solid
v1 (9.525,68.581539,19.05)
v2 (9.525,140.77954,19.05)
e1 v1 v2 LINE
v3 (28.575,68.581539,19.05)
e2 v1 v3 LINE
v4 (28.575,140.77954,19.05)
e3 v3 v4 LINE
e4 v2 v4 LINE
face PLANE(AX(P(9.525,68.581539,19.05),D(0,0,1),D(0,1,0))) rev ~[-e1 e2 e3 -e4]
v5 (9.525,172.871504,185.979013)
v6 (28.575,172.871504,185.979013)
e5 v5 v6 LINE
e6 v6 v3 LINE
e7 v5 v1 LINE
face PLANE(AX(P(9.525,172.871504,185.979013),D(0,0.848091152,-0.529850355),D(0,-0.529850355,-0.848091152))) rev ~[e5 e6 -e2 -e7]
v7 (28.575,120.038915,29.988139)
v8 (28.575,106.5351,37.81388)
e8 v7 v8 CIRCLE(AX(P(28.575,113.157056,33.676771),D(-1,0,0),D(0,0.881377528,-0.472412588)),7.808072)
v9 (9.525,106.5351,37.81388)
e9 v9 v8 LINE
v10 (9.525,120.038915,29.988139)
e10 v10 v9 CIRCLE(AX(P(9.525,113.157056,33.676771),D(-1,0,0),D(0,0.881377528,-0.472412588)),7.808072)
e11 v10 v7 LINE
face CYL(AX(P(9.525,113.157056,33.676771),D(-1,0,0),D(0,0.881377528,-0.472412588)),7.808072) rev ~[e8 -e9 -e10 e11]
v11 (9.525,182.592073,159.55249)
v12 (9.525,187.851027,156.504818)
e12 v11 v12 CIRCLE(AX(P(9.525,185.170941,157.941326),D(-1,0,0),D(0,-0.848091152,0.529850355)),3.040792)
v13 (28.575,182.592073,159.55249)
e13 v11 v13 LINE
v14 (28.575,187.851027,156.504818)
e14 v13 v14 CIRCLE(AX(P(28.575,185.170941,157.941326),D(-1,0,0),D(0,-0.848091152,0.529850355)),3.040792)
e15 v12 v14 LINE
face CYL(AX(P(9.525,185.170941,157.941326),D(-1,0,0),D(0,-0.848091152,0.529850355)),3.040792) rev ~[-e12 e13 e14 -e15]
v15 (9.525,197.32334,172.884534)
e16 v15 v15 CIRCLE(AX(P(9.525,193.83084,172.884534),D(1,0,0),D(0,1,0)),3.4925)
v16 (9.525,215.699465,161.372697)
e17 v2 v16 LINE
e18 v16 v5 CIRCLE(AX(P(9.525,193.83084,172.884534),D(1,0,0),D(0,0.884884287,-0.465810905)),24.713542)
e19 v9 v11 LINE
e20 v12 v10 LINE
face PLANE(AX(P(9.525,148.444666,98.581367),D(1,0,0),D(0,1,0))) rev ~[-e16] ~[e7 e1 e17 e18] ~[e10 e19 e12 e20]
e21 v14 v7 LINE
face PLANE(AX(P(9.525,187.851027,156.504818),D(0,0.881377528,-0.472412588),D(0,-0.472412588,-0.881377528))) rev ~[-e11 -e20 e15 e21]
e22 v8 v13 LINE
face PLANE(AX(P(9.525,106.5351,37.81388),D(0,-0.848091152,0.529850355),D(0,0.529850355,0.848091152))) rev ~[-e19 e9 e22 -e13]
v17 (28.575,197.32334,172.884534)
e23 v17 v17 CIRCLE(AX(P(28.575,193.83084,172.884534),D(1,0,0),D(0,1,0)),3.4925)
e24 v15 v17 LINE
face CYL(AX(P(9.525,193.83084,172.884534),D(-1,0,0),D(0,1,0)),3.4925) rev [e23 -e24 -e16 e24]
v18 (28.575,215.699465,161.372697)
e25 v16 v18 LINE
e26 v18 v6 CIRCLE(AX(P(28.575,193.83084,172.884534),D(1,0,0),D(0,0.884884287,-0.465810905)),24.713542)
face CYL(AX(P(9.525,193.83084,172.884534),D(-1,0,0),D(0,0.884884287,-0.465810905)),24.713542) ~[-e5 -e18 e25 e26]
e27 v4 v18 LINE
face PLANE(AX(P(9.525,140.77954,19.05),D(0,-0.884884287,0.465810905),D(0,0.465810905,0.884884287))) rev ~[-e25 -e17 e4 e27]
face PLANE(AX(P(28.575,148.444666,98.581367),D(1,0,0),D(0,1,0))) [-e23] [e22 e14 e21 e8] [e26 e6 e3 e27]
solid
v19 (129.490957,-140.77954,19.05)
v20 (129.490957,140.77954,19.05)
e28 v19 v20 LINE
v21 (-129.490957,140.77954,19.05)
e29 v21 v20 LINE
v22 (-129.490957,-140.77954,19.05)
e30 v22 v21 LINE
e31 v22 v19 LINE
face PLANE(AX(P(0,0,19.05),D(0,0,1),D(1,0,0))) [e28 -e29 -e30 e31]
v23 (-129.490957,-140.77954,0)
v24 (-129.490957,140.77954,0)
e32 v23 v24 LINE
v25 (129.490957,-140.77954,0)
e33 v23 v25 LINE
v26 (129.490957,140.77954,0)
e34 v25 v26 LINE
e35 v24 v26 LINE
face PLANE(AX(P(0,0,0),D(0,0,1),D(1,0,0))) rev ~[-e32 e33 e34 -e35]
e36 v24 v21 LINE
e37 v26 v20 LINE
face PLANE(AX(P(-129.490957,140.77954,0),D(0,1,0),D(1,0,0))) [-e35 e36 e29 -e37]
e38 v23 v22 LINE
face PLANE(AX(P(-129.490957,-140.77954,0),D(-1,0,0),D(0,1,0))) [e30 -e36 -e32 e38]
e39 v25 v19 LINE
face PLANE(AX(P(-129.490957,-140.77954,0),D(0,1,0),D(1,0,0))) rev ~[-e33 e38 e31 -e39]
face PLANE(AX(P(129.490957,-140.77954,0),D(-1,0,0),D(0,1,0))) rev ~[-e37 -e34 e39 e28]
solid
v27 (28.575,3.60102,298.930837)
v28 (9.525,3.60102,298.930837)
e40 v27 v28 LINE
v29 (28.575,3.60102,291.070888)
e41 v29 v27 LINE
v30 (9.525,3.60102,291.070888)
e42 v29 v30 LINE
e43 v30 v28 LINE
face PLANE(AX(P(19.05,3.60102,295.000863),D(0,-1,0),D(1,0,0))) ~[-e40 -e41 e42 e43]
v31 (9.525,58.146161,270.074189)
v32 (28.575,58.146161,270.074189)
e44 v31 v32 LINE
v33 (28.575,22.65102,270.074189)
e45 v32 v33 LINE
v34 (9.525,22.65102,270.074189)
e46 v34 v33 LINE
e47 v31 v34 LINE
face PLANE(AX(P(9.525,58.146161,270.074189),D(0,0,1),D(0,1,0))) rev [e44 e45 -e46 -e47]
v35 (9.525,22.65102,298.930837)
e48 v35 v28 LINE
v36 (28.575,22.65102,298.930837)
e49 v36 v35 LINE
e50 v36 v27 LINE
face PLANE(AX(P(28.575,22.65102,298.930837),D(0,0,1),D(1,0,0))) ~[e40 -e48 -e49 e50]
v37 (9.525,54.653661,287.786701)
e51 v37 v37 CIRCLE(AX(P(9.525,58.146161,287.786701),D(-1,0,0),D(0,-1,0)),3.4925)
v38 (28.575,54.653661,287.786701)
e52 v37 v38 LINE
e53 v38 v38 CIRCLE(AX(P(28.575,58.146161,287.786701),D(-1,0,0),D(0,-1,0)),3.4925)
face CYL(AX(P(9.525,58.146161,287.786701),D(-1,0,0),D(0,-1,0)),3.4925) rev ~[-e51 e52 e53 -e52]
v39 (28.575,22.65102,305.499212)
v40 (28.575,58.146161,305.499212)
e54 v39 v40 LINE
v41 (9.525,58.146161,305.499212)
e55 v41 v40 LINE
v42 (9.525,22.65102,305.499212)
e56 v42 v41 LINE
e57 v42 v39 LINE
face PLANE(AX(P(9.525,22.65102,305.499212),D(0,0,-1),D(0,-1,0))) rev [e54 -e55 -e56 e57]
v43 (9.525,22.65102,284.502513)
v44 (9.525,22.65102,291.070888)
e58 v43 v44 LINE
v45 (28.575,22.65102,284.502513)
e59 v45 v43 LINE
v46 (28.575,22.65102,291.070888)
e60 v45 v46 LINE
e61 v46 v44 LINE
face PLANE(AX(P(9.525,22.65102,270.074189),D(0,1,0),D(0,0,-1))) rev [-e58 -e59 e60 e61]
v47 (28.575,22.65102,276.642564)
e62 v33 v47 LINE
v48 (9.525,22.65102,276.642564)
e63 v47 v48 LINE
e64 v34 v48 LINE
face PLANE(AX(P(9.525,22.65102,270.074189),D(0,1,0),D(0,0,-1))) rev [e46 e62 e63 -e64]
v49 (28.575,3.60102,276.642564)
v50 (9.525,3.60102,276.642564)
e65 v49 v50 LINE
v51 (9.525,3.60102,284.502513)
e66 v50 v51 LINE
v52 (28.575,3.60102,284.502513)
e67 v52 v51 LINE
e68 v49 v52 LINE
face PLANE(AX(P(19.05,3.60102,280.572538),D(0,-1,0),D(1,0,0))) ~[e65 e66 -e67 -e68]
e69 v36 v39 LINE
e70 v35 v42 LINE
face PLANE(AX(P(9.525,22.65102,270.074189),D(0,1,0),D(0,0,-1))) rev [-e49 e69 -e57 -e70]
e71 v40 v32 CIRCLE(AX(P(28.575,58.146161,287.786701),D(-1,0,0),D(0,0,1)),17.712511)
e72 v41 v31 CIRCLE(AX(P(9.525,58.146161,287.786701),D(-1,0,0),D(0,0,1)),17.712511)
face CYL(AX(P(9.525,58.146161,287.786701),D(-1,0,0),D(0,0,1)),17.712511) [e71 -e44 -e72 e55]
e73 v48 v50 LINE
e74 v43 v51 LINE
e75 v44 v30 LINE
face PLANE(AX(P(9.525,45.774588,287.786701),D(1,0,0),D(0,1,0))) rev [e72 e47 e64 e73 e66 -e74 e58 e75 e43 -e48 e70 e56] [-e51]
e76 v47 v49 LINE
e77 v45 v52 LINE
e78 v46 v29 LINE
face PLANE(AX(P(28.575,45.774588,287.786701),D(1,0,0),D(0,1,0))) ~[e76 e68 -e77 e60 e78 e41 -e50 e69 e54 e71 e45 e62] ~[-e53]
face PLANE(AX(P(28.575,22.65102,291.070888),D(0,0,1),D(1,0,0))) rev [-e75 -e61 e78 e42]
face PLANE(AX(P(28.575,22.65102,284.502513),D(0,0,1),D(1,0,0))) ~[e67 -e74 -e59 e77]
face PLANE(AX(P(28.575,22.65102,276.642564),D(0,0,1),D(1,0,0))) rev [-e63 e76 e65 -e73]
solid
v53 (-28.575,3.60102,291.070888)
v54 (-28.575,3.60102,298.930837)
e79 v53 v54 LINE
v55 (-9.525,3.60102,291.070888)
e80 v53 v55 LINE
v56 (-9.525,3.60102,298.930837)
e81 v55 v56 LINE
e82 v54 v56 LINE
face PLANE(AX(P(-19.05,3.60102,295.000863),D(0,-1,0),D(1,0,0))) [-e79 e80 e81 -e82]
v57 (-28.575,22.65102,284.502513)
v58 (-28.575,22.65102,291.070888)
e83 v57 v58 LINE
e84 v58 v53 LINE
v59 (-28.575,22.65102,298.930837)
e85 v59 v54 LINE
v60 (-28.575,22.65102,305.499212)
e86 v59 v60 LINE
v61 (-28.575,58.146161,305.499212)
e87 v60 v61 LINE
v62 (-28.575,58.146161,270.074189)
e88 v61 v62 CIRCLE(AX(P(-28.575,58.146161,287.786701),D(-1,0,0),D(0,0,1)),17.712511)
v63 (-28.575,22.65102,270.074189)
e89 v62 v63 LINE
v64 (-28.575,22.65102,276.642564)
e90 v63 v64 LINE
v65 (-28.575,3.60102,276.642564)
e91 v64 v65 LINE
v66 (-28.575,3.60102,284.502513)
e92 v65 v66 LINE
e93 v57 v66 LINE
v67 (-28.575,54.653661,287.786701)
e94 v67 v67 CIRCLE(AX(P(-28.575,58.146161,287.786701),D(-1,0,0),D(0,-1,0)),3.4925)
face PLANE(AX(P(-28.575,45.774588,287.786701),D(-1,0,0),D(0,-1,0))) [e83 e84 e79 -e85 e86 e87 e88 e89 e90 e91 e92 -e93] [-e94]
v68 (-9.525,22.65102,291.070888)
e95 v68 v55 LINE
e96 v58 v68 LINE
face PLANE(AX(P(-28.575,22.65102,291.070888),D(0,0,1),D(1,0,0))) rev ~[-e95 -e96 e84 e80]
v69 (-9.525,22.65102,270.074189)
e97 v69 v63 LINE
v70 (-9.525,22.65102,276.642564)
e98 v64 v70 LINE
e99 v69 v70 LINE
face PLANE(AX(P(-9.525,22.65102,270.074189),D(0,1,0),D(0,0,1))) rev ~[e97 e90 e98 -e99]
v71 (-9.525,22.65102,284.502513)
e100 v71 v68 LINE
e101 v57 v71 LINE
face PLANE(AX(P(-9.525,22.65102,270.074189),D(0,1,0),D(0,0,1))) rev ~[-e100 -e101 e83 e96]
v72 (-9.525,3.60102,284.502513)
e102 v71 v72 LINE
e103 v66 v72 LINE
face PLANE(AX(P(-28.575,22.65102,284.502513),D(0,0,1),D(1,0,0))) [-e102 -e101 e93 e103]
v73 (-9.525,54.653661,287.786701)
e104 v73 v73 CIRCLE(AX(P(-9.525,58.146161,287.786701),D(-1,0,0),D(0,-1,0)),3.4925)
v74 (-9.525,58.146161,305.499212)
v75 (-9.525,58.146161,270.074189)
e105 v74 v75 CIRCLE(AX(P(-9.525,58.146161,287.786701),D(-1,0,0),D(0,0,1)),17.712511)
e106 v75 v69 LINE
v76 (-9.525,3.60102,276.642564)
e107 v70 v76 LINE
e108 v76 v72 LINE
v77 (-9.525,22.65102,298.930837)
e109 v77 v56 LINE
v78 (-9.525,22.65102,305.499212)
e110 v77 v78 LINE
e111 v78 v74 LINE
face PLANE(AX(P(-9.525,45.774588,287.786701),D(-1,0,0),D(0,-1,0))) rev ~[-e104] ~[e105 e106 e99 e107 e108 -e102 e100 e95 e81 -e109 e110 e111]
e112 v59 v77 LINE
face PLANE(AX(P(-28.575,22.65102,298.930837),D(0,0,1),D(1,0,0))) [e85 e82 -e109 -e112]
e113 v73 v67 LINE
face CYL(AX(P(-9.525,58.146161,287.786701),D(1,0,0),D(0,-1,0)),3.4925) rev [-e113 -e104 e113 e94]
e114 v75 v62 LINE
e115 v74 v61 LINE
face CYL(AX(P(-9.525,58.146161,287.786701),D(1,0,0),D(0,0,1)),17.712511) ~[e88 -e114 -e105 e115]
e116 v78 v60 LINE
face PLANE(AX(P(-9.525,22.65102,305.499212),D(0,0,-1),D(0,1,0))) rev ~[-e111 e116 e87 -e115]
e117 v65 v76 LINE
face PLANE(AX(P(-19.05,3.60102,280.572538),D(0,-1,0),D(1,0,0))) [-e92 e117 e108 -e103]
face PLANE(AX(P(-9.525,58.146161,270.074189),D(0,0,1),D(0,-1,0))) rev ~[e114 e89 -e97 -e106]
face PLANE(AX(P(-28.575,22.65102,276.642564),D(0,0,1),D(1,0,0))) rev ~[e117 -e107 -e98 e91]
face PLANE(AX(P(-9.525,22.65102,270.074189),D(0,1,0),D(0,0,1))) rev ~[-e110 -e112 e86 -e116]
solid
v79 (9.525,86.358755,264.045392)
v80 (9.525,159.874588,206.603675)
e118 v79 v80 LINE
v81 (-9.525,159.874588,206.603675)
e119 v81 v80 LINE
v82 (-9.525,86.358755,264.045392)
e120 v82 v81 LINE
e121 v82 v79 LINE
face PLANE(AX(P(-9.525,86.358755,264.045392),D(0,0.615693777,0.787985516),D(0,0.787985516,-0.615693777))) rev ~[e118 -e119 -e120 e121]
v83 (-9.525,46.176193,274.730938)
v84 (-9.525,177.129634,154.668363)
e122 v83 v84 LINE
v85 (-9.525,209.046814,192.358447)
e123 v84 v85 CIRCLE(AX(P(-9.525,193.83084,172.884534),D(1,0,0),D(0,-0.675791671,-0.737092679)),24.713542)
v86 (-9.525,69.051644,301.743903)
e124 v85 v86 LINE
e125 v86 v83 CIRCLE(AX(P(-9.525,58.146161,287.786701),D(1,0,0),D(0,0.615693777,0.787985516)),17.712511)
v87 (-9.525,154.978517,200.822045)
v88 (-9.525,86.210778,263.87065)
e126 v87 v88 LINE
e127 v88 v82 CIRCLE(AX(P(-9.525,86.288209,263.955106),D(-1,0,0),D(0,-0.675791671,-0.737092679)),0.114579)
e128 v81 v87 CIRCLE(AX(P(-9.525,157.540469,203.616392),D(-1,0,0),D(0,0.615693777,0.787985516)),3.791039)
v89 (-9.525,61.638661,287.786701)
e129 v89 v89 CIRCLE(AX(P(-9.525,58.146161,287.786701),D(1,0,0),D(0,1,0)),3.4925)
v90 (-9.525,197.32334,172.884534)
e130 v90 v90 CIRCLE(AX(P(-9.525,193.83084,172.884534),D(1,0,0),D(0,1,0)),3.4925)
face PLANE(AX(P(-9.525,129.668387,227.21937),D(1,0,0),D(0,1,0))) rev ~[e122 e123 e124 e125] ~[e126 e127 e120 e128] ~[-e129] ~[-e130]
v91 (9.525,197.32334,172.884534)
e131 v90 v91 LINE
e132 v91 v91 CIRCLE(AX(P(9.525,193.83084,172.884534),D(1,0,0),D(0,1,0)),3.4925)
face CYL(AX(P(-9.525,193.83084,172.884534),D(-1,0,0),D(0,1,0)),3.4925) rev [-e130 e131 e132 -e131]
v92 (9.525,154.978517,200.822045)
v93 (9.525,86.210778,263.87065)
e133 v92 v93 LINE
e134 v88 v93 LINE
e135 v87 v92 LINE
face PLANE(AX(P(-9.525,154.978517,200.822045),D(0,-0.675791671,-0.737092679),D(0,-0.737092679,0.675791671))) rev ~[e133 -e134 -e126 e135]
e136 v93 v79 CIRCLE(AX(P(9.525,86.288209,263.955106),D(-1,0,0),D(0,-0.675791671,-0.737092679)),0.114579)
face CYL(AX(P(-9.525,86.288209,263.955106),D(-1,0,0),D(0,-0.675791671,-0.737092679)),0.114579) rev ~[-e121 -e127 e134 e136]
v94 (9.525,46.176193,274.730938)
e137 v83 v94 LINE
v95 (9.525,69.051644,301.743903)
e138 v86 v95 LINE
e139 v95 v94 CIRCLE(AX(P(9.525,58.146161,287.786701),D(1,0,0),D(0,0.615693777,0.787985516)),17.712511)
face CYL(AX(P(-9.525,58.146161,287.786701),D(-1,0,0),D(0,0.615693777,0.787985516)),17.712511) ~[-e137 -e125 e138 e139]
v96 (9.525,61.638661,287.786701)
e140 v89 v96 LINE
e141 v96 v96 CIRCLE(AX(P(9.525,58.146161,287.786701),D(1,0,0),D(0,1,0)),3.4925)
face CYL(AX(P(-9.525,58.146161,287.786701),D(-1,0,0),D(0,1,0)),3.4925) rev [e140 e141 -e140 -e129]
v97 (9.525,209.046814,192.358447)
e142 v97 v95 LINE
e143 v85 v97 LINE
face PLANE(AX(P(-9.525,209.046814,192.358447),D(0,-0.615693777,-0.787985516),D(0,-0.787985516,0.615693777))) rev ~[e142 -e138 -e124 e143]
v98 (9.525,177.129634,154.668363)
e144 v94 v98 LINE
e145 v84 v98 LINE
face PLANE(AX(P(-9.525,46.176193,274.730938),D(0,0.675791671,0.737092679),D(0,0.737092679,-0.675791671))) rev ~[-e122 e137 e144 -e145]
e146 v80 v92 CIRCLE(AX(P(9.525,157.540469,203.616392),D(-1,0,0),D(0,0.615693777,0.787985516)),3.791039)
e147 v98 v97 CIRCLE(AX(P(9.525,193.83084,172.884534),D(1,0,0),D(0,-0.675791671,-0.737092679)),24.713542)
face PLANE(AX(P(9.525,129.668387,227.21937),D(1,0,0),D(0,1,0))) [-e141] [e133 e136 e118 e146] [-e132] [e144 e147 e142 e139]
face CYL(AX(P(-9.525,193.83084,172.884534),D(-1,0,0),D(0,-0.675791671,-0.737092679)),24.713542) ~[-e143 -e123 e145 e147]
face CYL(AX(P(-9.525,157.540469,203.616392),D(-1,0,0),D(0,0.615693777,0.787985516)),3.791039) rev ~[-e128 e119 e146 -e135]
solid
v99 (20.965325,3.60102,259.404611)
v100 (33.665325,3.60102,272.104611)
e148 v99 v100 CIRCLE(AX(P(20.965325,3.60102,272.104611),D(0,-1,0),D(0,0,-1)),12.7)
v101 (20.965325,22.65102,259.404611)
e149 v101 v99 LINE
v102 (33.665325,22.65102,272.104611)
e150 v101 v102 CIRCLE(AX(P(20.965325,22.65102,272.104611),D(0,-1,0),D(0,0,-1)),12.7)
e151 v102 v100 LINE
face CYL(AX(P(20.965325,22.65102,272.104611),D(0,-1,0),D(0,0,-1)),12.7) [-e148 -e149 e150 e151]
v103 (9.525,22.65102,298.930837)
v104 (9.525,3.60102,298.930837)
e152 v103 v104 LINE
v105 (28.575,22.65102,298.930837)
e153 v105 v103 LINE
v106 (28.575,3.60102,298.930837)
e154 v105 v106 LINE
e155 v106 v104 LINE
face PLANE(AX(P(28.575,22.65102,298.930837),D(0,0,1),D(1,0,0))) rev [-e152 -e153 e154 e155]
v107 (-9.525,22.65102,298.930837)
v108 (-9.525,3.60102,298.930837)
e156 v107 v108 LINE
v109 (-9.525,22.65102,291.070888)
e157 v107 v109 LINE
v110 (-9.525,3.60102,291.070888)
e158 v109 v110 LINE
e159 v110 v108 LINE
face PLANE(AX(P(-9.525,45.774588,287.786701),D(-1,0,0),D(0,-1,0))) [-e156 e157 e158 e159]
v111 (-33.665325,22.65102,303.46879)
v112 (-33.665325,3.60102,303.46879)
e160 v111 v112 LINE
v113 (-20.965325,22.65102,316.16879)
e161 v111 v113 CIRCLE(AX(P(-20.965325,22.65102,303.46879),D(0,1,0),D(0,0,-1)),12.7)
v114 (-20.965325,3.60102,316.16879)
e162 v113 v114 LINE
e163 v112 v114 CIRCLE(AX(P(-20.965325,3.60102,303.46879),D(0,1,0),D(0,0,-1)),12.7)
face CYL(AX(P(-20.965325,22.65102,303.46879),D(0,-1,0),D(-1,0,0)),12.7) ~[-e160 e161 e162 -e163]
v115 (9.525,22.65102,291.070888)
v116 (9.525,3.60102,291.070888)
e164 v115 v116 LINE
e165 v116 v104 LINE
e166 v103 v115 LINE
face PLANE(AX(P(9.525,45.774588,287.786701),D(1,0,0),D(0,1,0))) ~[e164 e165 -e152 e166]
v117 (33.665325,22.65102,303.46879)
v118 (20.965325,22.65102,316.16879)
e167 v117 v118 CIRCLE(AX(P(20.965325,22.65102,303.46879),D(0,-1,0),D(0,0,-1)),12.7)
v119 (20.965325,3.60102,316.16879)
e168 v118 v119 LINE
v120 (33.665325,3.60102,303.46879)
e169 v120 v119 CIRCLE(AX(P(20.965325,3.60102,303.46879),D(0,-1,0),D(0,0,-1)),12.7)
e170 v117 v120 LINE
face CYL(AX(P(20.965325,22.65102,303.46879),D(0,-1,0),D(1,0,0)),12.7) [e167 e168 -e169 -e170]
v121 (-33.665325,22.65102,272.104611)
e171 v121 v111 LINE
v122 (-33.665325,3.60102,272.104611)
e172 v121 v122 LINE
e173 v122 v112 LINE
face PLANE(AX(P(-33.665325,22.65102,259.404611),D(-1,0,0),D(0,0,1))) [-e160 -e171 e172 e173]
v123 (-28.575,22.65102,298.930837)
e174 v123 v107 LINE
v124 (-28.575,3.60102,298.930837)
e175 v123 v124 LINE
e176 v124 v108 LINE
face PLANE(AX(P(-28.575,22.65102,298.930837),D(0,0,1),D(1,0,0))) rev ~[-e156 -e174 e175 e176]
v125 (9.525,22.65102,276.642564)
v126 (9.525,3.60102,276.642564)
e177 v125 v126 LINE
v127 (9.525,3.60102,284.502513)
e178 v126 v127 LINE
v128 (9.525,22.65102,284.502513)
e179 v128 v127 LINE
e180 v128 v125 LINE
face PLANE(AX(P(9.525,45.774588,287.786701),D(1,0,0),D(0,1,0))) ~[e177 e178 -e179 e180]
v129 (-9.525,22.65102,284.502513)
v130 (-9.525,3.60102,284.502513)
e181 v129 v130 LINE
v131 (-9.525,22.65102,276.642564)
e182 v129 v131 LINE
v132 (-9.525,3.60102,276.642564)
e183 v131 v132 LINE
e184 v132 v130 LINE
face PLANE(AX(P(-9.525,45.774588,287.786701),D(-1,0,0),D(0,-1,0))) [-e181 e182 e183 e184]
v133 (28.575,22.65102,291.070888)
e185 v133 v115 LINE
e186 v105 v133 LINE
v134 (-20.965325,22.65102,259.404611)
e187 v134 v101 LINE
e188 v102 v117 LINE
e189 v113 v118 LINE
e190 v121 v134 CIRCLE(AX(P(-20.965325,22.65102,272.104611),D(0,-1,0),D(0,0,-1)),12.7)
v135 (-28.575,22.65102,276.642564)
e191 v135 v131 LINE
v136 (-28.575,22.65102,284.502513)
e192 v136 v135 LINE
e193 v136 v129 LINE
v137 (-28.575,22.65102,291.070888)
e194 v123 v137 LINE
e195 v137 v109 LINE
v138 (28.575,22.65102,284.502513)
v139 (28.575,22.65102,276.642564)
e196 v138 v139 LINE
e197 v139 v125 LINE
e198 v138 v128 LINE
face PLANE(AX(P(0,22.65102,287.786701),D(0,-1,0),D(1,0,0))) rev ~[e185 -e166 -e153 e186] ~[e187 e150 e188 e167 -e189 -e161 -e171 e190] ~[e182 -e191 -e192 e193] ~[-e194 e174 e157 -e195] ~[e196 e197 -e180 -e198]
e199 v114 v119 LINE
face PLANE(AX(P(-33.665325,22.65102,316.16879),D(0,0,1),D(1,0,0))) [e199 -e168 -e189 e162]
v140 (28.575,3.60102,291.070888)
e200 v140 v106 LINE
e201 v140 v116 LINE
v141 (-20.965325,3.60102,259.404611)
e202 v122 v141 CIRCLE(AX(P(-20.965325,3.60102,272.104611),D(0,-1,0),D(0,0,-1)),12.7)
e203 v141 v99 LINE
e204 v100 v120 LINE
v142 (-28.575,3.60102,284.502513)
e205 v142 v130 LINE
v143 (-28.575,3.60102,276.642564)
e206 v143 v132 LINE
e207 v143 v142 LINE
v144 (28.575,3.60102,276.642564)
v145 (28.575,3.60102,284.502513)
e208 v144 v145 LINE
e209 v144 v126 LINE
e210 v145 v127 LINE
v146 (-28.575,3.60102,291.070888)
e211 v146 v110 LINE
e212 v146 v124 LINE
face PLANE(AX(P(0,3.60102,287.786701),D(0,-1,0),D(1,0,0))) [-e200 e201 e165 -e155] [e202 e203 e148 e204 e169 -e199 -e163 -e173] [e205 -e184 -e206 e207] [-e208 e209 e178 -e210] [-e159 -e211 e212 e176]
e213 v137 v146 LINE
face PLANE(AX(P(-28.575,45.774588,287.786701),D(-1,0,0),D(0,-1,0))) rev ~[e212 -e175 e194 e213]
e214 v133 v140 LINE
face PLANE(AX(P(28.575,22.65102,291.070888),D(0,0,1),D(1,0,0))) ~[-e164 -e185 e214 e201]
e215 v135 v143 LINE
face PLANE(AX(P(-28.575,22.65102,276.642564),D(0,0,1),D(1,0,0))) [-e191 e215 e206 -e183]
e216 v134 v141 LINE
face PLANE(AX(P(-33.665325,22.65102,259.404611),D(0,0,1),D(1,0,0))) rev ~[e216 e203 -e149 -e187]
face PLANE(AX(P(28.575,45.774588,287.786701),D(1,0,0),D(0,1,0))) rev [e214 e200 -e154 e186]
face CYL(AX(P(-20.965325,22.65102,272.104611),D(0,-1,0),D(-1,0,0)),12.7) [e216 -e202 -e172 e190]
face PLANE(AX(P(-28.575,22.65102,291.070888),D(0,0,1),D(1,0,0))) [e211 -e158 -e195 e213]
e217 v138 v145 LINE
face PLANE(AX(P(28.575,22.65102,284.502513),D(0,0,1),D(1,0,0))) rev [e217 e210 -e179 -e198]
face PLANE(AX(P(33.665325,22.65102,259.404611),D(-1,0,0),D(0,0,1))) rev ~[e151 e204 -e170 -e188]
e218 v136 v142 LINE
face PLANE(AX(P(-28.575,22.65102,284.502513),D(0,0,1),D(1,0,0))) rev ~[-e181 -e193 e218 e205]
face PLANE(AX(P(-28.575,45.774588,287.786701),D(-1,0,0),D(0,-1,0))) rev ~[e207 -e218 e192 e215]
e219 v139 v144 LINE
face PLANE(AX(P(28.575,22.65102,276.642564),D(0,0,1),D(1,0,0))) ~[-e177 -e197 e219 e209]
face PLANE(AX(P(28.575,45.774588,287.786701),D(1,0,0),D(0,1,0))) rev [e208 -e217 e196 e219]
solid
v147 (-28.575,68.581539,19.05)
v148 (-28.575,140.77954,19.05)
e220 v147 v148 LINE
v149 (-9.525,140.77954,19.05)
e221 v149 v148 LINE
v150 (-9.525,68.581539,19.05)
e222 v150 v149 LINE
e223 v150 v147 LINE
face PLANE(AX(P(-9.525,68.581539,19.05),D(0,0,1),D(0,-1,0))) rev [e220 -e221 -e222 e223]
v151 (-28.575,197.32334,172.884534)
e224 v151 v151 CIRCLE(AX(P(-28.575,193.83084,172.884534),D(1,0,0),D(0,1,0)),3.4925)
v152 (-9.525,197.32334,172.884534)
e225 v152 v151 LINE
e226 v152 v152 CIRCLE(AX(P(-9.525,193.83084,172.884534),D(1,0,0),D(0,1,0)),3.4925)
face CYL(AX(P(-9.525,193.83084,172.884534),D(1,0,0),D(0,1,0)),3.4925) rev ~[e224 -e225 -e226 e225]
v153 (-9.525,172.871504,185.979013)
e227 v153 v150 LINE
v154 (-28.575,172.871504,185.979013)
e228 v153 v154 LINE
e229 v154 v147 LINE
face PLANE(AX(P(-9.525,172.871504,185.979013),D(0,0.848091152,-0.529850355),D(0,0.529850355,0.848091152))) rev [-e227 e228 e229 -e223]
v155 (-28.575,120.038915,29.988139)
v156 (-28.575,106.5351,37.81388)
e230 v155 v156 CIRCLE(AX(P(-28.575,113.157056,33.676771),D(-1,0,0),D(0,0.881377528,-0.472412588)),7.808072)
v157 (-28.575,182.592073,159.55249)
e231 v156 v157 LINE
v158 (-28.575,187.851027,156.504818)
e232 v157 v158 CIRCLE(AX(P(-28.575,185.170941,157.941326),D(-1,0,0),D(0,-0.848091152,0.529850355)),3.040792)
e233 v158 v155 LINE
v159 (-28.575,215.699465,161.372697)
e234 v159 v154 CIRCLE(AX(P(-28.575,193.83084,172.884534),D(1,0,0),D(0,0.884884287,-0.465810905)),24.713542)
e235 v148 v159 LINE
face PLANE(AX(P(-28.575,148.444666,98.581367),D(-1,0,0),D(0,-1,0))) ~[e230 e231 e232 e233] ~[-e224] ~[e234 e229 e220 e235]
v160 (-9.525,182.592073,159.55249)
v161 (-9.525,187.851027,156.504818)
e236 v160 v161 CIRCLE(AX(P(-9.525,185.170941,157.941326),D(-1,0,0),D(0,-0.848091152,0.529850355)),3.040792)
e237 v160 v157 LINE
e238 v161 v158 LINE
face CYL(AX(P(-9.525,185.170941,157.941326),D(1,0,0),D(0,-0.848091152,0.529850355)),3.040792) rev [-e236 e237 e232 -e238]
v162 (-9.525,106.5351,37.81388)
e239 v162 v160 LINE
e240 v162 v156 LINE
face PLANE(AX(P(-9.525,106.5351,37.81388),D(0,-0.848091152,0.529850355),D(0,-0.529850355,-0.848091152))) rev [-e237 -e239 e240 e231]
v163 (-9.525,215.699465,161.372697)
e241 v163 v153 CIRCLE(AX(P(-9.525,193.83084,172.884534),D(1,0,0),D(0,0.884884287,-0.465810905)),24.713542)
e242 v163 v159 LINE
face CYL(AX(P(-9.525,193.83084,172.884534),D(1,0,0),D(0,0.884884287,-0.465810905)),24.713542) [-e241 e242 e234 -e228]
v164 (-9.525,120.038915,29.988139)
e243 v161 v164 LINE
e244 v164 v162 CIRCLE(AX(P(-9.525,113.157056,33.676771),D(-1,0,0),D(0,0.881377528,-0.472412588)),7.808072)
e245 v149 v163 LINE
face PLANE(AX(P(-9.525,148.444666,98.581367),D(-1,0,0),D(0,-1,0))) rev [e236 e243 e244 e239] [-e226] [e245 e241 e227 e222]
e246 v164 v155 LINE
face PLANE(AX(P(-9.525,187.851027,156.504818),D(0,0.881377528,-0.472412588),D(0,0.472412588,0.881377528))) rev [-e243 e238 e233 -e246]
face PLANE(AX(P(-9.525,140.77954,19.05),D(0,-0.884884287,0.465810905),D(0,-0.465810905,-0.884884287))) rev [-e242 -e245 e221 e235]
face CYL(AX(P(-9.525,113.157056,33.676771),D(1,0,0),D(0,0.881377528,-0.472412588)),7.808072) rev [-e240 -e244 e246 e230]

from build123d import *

# Parameters (mm, degrees)
F1_W      = 258.9819133282
F1_H      = 281.5590798855
F2_DEPTH  = 19.05
F4_R      = 3.4925
F5_DEPTH  = 19.05
F7_R      = 3.4925
F8_DEPTH  = 19.05
F9_R      = 3.4925
F10_DEPTH = 19.05
F11_W     = 19.05
F11_H     = 7.8599496324
F12_DEPTH = 19.05
F14_W     = 67.3306509852
F14_H     = 56.7641787347
F15_DEPTH = 19.05
F16_R     = 12.7


# Not quite as in the source:
# - a length typed as a fraction of an inch, garbled in the dataset ("3 / 203.2 mm" for 3/8 in), is restored


with BuildPart() as f2:
    # F1 (on Top) → F2 (new body)
    with BuildSketch(Plane.XY):
        Rectangle(F1_W, F1_H)
    extrude(amount=F2_DEPTH)


with BuildPart() as f5:
    # F4 (on offset) → F5 (new body)
    with BuildSketch(Plane.YZ.offset(9.525)):
        with BuildLine():
            Line((172.8715040576, 185.9790129475), (68.581538884, 19.05))
            Line((68.581538884, 19.05), (140.7795399427, 19.05))
            Line((140.7795399427, 19.05), (215.6994648239, 161.3726968817))
            ThreePointArc((215.6994648239, 161.3726968817), (206.1423956156, 194.3131305331), (172.8715040576, 185.9790129475))
        make_face()
        with BuildLine():
            Line((106.5350997704, 37.813880341), (182.5920726412, 159.5524904553))
            ThreePointArc((182.5920726412, 159.5524904553), (186.6956178335, 160.572252657), (187.8510267574, 156.5048175547))
            Line((187.8510267574, 156.5048175547), (120.0389151124, 29.9881394879))
            ThreePointArc((120.0389151124, 29.9881394879), (109.2420284863, 26.9211405451), (106.5350997704, 37.813880341))
        make_face(mode=Mode.SUBTRACT)
        with Locations((193.8308401065, 172.8845341148)):
            Circle(F4_R, mode=Mode.SUBTRACT)
    extrude(amount=F5_DEPTH)


with BuildPart() as f6_1:
    # F6: instance of F5
    add(f5.part.mirror(Plane.YZ))


with BuildPart() as f8:
    # F7 (on face) → F8 (new body)
    with BuildSketch(Plane.YZ.offset(-9.525)):
        with BuildLine():
            Line((46.176193297, 274.7309380486), (177.1296344703, 154.6683634467))
            ThreePointArc((177.1296344703, 154.6683634467), (212.6905081368, 156.9135583995), (209.0468139458, 192.3584470147))
            Line((209.0468139458, 192.3584470147), (69.05164406, 301.7439030123))
            ThreePointArc((69.05164406, 301.7439030123), (44.6291956916, 299.2333031282), (46.176193297, 274.7309380486))
        make_face()
        with Locations((193.8308401065, 172.8845341148)):
            Circle(F7_R, mode=Mode.SUBTRACT)
        with BuildLine():
            ThreePointArc((86.2107777334, 263.8706501543), (86.2007704818, 264.0291515835), (86.3587549441, 264.0453922064))
            Line((86.3587549441, 264.0453922064), (159.8745879565, 206.6036752981))
            ThreePointArc((159.8745879565, 206.6036752981), (160.4335278853, 201.1664562348), (154.9785168029, 200.8220450298))
            Line((154.9785168029, 200.8220450298), (86.2107777334, 263.8706501543))
        make_face(mode=Mode.SUBTRACT)
        with Locations((58.1461609912, 287.7867005582)):
            Circle(F7_R, mode=Mode.SUBTRACT)
    extrude(amount=F8_DEPTH)


with BuildPart() as f10:
    # F9 (on face) → F10 (new body)
    with BuildSketch(Plane(origin=(-9.525, 0, 0), x_dir=(0, -1, 0), z_dir=(-1, 0, 0))):
        with BuildLine():
            Line((-22.6510197505, 305.4992119924), (-58.1461609912, 305.4992119924))
            ThreePointArc((-58.1461609912, 305.4992119924), (-75.8586724255, 287.7867005582), (-58.1461609912, 270.074189124))
            Line((-58.1461609912, 270.074189124), (-22.6510197505, 270.074189124))
            Line((-22.6510197505, 270.074189124), (-22.6510197505, 305.4992119924))
        make_face()
        with Locations((-58.1461609912, 287.7867005582)):
            Circle(F9_R, mode=Mode.SUBTRACT)
    extrude(amount=F10_DEPTH)

    # F11 (on face) → F12 (join)
    with BuildSketch(Plane.XZ.offset(-22.6510197505)):
        with Locations((-19.05, 295.0008626417)):
            Rectangle(F11_W, F11_H)
        with Locations((-19.05, 280.5725384747)):
            Rectangle(F11_W, F11_H)
    extrude(amount=F12_DEPTH)


with BuildPart() as f13_1:
    # F13: instance of F10
    add(f10.part.mirror(Plane.YZ))


with BuildPart() as f15:
    # F14 (on face) → F15 (new body)
    with BuildSketch(Plane.XZ.offset(-22.6510197505)):
        with Locations((0, 287.7867005582)):
            Rectangle(F14_W, F14_H)
    extrude(amount=F15_DEPTH)

    # F16
    f16_edges = [f15.edges().sort_by_distance(p)[0] for p in [
        (-33.665325, 13.12602, 316.16879),
        (33.665325, 13.12602, 316.16879),
        (33.665325, 13.12602, 259.404611),
        (-33.665325, 13.12602, 259.404611),
    ]]
    fillet(f16_edges, radius=F16_R)

    # F17: cut F10, F13_1
    add(f10.part, mode=Mode.SUBTRACT)
    add(f13_1.part, mode=Mode.SUBTRACT)


solid = Compound([f2.part, f5.part, f6_1.part, f8.part, f10.part, f13_1.part, f15.part])
